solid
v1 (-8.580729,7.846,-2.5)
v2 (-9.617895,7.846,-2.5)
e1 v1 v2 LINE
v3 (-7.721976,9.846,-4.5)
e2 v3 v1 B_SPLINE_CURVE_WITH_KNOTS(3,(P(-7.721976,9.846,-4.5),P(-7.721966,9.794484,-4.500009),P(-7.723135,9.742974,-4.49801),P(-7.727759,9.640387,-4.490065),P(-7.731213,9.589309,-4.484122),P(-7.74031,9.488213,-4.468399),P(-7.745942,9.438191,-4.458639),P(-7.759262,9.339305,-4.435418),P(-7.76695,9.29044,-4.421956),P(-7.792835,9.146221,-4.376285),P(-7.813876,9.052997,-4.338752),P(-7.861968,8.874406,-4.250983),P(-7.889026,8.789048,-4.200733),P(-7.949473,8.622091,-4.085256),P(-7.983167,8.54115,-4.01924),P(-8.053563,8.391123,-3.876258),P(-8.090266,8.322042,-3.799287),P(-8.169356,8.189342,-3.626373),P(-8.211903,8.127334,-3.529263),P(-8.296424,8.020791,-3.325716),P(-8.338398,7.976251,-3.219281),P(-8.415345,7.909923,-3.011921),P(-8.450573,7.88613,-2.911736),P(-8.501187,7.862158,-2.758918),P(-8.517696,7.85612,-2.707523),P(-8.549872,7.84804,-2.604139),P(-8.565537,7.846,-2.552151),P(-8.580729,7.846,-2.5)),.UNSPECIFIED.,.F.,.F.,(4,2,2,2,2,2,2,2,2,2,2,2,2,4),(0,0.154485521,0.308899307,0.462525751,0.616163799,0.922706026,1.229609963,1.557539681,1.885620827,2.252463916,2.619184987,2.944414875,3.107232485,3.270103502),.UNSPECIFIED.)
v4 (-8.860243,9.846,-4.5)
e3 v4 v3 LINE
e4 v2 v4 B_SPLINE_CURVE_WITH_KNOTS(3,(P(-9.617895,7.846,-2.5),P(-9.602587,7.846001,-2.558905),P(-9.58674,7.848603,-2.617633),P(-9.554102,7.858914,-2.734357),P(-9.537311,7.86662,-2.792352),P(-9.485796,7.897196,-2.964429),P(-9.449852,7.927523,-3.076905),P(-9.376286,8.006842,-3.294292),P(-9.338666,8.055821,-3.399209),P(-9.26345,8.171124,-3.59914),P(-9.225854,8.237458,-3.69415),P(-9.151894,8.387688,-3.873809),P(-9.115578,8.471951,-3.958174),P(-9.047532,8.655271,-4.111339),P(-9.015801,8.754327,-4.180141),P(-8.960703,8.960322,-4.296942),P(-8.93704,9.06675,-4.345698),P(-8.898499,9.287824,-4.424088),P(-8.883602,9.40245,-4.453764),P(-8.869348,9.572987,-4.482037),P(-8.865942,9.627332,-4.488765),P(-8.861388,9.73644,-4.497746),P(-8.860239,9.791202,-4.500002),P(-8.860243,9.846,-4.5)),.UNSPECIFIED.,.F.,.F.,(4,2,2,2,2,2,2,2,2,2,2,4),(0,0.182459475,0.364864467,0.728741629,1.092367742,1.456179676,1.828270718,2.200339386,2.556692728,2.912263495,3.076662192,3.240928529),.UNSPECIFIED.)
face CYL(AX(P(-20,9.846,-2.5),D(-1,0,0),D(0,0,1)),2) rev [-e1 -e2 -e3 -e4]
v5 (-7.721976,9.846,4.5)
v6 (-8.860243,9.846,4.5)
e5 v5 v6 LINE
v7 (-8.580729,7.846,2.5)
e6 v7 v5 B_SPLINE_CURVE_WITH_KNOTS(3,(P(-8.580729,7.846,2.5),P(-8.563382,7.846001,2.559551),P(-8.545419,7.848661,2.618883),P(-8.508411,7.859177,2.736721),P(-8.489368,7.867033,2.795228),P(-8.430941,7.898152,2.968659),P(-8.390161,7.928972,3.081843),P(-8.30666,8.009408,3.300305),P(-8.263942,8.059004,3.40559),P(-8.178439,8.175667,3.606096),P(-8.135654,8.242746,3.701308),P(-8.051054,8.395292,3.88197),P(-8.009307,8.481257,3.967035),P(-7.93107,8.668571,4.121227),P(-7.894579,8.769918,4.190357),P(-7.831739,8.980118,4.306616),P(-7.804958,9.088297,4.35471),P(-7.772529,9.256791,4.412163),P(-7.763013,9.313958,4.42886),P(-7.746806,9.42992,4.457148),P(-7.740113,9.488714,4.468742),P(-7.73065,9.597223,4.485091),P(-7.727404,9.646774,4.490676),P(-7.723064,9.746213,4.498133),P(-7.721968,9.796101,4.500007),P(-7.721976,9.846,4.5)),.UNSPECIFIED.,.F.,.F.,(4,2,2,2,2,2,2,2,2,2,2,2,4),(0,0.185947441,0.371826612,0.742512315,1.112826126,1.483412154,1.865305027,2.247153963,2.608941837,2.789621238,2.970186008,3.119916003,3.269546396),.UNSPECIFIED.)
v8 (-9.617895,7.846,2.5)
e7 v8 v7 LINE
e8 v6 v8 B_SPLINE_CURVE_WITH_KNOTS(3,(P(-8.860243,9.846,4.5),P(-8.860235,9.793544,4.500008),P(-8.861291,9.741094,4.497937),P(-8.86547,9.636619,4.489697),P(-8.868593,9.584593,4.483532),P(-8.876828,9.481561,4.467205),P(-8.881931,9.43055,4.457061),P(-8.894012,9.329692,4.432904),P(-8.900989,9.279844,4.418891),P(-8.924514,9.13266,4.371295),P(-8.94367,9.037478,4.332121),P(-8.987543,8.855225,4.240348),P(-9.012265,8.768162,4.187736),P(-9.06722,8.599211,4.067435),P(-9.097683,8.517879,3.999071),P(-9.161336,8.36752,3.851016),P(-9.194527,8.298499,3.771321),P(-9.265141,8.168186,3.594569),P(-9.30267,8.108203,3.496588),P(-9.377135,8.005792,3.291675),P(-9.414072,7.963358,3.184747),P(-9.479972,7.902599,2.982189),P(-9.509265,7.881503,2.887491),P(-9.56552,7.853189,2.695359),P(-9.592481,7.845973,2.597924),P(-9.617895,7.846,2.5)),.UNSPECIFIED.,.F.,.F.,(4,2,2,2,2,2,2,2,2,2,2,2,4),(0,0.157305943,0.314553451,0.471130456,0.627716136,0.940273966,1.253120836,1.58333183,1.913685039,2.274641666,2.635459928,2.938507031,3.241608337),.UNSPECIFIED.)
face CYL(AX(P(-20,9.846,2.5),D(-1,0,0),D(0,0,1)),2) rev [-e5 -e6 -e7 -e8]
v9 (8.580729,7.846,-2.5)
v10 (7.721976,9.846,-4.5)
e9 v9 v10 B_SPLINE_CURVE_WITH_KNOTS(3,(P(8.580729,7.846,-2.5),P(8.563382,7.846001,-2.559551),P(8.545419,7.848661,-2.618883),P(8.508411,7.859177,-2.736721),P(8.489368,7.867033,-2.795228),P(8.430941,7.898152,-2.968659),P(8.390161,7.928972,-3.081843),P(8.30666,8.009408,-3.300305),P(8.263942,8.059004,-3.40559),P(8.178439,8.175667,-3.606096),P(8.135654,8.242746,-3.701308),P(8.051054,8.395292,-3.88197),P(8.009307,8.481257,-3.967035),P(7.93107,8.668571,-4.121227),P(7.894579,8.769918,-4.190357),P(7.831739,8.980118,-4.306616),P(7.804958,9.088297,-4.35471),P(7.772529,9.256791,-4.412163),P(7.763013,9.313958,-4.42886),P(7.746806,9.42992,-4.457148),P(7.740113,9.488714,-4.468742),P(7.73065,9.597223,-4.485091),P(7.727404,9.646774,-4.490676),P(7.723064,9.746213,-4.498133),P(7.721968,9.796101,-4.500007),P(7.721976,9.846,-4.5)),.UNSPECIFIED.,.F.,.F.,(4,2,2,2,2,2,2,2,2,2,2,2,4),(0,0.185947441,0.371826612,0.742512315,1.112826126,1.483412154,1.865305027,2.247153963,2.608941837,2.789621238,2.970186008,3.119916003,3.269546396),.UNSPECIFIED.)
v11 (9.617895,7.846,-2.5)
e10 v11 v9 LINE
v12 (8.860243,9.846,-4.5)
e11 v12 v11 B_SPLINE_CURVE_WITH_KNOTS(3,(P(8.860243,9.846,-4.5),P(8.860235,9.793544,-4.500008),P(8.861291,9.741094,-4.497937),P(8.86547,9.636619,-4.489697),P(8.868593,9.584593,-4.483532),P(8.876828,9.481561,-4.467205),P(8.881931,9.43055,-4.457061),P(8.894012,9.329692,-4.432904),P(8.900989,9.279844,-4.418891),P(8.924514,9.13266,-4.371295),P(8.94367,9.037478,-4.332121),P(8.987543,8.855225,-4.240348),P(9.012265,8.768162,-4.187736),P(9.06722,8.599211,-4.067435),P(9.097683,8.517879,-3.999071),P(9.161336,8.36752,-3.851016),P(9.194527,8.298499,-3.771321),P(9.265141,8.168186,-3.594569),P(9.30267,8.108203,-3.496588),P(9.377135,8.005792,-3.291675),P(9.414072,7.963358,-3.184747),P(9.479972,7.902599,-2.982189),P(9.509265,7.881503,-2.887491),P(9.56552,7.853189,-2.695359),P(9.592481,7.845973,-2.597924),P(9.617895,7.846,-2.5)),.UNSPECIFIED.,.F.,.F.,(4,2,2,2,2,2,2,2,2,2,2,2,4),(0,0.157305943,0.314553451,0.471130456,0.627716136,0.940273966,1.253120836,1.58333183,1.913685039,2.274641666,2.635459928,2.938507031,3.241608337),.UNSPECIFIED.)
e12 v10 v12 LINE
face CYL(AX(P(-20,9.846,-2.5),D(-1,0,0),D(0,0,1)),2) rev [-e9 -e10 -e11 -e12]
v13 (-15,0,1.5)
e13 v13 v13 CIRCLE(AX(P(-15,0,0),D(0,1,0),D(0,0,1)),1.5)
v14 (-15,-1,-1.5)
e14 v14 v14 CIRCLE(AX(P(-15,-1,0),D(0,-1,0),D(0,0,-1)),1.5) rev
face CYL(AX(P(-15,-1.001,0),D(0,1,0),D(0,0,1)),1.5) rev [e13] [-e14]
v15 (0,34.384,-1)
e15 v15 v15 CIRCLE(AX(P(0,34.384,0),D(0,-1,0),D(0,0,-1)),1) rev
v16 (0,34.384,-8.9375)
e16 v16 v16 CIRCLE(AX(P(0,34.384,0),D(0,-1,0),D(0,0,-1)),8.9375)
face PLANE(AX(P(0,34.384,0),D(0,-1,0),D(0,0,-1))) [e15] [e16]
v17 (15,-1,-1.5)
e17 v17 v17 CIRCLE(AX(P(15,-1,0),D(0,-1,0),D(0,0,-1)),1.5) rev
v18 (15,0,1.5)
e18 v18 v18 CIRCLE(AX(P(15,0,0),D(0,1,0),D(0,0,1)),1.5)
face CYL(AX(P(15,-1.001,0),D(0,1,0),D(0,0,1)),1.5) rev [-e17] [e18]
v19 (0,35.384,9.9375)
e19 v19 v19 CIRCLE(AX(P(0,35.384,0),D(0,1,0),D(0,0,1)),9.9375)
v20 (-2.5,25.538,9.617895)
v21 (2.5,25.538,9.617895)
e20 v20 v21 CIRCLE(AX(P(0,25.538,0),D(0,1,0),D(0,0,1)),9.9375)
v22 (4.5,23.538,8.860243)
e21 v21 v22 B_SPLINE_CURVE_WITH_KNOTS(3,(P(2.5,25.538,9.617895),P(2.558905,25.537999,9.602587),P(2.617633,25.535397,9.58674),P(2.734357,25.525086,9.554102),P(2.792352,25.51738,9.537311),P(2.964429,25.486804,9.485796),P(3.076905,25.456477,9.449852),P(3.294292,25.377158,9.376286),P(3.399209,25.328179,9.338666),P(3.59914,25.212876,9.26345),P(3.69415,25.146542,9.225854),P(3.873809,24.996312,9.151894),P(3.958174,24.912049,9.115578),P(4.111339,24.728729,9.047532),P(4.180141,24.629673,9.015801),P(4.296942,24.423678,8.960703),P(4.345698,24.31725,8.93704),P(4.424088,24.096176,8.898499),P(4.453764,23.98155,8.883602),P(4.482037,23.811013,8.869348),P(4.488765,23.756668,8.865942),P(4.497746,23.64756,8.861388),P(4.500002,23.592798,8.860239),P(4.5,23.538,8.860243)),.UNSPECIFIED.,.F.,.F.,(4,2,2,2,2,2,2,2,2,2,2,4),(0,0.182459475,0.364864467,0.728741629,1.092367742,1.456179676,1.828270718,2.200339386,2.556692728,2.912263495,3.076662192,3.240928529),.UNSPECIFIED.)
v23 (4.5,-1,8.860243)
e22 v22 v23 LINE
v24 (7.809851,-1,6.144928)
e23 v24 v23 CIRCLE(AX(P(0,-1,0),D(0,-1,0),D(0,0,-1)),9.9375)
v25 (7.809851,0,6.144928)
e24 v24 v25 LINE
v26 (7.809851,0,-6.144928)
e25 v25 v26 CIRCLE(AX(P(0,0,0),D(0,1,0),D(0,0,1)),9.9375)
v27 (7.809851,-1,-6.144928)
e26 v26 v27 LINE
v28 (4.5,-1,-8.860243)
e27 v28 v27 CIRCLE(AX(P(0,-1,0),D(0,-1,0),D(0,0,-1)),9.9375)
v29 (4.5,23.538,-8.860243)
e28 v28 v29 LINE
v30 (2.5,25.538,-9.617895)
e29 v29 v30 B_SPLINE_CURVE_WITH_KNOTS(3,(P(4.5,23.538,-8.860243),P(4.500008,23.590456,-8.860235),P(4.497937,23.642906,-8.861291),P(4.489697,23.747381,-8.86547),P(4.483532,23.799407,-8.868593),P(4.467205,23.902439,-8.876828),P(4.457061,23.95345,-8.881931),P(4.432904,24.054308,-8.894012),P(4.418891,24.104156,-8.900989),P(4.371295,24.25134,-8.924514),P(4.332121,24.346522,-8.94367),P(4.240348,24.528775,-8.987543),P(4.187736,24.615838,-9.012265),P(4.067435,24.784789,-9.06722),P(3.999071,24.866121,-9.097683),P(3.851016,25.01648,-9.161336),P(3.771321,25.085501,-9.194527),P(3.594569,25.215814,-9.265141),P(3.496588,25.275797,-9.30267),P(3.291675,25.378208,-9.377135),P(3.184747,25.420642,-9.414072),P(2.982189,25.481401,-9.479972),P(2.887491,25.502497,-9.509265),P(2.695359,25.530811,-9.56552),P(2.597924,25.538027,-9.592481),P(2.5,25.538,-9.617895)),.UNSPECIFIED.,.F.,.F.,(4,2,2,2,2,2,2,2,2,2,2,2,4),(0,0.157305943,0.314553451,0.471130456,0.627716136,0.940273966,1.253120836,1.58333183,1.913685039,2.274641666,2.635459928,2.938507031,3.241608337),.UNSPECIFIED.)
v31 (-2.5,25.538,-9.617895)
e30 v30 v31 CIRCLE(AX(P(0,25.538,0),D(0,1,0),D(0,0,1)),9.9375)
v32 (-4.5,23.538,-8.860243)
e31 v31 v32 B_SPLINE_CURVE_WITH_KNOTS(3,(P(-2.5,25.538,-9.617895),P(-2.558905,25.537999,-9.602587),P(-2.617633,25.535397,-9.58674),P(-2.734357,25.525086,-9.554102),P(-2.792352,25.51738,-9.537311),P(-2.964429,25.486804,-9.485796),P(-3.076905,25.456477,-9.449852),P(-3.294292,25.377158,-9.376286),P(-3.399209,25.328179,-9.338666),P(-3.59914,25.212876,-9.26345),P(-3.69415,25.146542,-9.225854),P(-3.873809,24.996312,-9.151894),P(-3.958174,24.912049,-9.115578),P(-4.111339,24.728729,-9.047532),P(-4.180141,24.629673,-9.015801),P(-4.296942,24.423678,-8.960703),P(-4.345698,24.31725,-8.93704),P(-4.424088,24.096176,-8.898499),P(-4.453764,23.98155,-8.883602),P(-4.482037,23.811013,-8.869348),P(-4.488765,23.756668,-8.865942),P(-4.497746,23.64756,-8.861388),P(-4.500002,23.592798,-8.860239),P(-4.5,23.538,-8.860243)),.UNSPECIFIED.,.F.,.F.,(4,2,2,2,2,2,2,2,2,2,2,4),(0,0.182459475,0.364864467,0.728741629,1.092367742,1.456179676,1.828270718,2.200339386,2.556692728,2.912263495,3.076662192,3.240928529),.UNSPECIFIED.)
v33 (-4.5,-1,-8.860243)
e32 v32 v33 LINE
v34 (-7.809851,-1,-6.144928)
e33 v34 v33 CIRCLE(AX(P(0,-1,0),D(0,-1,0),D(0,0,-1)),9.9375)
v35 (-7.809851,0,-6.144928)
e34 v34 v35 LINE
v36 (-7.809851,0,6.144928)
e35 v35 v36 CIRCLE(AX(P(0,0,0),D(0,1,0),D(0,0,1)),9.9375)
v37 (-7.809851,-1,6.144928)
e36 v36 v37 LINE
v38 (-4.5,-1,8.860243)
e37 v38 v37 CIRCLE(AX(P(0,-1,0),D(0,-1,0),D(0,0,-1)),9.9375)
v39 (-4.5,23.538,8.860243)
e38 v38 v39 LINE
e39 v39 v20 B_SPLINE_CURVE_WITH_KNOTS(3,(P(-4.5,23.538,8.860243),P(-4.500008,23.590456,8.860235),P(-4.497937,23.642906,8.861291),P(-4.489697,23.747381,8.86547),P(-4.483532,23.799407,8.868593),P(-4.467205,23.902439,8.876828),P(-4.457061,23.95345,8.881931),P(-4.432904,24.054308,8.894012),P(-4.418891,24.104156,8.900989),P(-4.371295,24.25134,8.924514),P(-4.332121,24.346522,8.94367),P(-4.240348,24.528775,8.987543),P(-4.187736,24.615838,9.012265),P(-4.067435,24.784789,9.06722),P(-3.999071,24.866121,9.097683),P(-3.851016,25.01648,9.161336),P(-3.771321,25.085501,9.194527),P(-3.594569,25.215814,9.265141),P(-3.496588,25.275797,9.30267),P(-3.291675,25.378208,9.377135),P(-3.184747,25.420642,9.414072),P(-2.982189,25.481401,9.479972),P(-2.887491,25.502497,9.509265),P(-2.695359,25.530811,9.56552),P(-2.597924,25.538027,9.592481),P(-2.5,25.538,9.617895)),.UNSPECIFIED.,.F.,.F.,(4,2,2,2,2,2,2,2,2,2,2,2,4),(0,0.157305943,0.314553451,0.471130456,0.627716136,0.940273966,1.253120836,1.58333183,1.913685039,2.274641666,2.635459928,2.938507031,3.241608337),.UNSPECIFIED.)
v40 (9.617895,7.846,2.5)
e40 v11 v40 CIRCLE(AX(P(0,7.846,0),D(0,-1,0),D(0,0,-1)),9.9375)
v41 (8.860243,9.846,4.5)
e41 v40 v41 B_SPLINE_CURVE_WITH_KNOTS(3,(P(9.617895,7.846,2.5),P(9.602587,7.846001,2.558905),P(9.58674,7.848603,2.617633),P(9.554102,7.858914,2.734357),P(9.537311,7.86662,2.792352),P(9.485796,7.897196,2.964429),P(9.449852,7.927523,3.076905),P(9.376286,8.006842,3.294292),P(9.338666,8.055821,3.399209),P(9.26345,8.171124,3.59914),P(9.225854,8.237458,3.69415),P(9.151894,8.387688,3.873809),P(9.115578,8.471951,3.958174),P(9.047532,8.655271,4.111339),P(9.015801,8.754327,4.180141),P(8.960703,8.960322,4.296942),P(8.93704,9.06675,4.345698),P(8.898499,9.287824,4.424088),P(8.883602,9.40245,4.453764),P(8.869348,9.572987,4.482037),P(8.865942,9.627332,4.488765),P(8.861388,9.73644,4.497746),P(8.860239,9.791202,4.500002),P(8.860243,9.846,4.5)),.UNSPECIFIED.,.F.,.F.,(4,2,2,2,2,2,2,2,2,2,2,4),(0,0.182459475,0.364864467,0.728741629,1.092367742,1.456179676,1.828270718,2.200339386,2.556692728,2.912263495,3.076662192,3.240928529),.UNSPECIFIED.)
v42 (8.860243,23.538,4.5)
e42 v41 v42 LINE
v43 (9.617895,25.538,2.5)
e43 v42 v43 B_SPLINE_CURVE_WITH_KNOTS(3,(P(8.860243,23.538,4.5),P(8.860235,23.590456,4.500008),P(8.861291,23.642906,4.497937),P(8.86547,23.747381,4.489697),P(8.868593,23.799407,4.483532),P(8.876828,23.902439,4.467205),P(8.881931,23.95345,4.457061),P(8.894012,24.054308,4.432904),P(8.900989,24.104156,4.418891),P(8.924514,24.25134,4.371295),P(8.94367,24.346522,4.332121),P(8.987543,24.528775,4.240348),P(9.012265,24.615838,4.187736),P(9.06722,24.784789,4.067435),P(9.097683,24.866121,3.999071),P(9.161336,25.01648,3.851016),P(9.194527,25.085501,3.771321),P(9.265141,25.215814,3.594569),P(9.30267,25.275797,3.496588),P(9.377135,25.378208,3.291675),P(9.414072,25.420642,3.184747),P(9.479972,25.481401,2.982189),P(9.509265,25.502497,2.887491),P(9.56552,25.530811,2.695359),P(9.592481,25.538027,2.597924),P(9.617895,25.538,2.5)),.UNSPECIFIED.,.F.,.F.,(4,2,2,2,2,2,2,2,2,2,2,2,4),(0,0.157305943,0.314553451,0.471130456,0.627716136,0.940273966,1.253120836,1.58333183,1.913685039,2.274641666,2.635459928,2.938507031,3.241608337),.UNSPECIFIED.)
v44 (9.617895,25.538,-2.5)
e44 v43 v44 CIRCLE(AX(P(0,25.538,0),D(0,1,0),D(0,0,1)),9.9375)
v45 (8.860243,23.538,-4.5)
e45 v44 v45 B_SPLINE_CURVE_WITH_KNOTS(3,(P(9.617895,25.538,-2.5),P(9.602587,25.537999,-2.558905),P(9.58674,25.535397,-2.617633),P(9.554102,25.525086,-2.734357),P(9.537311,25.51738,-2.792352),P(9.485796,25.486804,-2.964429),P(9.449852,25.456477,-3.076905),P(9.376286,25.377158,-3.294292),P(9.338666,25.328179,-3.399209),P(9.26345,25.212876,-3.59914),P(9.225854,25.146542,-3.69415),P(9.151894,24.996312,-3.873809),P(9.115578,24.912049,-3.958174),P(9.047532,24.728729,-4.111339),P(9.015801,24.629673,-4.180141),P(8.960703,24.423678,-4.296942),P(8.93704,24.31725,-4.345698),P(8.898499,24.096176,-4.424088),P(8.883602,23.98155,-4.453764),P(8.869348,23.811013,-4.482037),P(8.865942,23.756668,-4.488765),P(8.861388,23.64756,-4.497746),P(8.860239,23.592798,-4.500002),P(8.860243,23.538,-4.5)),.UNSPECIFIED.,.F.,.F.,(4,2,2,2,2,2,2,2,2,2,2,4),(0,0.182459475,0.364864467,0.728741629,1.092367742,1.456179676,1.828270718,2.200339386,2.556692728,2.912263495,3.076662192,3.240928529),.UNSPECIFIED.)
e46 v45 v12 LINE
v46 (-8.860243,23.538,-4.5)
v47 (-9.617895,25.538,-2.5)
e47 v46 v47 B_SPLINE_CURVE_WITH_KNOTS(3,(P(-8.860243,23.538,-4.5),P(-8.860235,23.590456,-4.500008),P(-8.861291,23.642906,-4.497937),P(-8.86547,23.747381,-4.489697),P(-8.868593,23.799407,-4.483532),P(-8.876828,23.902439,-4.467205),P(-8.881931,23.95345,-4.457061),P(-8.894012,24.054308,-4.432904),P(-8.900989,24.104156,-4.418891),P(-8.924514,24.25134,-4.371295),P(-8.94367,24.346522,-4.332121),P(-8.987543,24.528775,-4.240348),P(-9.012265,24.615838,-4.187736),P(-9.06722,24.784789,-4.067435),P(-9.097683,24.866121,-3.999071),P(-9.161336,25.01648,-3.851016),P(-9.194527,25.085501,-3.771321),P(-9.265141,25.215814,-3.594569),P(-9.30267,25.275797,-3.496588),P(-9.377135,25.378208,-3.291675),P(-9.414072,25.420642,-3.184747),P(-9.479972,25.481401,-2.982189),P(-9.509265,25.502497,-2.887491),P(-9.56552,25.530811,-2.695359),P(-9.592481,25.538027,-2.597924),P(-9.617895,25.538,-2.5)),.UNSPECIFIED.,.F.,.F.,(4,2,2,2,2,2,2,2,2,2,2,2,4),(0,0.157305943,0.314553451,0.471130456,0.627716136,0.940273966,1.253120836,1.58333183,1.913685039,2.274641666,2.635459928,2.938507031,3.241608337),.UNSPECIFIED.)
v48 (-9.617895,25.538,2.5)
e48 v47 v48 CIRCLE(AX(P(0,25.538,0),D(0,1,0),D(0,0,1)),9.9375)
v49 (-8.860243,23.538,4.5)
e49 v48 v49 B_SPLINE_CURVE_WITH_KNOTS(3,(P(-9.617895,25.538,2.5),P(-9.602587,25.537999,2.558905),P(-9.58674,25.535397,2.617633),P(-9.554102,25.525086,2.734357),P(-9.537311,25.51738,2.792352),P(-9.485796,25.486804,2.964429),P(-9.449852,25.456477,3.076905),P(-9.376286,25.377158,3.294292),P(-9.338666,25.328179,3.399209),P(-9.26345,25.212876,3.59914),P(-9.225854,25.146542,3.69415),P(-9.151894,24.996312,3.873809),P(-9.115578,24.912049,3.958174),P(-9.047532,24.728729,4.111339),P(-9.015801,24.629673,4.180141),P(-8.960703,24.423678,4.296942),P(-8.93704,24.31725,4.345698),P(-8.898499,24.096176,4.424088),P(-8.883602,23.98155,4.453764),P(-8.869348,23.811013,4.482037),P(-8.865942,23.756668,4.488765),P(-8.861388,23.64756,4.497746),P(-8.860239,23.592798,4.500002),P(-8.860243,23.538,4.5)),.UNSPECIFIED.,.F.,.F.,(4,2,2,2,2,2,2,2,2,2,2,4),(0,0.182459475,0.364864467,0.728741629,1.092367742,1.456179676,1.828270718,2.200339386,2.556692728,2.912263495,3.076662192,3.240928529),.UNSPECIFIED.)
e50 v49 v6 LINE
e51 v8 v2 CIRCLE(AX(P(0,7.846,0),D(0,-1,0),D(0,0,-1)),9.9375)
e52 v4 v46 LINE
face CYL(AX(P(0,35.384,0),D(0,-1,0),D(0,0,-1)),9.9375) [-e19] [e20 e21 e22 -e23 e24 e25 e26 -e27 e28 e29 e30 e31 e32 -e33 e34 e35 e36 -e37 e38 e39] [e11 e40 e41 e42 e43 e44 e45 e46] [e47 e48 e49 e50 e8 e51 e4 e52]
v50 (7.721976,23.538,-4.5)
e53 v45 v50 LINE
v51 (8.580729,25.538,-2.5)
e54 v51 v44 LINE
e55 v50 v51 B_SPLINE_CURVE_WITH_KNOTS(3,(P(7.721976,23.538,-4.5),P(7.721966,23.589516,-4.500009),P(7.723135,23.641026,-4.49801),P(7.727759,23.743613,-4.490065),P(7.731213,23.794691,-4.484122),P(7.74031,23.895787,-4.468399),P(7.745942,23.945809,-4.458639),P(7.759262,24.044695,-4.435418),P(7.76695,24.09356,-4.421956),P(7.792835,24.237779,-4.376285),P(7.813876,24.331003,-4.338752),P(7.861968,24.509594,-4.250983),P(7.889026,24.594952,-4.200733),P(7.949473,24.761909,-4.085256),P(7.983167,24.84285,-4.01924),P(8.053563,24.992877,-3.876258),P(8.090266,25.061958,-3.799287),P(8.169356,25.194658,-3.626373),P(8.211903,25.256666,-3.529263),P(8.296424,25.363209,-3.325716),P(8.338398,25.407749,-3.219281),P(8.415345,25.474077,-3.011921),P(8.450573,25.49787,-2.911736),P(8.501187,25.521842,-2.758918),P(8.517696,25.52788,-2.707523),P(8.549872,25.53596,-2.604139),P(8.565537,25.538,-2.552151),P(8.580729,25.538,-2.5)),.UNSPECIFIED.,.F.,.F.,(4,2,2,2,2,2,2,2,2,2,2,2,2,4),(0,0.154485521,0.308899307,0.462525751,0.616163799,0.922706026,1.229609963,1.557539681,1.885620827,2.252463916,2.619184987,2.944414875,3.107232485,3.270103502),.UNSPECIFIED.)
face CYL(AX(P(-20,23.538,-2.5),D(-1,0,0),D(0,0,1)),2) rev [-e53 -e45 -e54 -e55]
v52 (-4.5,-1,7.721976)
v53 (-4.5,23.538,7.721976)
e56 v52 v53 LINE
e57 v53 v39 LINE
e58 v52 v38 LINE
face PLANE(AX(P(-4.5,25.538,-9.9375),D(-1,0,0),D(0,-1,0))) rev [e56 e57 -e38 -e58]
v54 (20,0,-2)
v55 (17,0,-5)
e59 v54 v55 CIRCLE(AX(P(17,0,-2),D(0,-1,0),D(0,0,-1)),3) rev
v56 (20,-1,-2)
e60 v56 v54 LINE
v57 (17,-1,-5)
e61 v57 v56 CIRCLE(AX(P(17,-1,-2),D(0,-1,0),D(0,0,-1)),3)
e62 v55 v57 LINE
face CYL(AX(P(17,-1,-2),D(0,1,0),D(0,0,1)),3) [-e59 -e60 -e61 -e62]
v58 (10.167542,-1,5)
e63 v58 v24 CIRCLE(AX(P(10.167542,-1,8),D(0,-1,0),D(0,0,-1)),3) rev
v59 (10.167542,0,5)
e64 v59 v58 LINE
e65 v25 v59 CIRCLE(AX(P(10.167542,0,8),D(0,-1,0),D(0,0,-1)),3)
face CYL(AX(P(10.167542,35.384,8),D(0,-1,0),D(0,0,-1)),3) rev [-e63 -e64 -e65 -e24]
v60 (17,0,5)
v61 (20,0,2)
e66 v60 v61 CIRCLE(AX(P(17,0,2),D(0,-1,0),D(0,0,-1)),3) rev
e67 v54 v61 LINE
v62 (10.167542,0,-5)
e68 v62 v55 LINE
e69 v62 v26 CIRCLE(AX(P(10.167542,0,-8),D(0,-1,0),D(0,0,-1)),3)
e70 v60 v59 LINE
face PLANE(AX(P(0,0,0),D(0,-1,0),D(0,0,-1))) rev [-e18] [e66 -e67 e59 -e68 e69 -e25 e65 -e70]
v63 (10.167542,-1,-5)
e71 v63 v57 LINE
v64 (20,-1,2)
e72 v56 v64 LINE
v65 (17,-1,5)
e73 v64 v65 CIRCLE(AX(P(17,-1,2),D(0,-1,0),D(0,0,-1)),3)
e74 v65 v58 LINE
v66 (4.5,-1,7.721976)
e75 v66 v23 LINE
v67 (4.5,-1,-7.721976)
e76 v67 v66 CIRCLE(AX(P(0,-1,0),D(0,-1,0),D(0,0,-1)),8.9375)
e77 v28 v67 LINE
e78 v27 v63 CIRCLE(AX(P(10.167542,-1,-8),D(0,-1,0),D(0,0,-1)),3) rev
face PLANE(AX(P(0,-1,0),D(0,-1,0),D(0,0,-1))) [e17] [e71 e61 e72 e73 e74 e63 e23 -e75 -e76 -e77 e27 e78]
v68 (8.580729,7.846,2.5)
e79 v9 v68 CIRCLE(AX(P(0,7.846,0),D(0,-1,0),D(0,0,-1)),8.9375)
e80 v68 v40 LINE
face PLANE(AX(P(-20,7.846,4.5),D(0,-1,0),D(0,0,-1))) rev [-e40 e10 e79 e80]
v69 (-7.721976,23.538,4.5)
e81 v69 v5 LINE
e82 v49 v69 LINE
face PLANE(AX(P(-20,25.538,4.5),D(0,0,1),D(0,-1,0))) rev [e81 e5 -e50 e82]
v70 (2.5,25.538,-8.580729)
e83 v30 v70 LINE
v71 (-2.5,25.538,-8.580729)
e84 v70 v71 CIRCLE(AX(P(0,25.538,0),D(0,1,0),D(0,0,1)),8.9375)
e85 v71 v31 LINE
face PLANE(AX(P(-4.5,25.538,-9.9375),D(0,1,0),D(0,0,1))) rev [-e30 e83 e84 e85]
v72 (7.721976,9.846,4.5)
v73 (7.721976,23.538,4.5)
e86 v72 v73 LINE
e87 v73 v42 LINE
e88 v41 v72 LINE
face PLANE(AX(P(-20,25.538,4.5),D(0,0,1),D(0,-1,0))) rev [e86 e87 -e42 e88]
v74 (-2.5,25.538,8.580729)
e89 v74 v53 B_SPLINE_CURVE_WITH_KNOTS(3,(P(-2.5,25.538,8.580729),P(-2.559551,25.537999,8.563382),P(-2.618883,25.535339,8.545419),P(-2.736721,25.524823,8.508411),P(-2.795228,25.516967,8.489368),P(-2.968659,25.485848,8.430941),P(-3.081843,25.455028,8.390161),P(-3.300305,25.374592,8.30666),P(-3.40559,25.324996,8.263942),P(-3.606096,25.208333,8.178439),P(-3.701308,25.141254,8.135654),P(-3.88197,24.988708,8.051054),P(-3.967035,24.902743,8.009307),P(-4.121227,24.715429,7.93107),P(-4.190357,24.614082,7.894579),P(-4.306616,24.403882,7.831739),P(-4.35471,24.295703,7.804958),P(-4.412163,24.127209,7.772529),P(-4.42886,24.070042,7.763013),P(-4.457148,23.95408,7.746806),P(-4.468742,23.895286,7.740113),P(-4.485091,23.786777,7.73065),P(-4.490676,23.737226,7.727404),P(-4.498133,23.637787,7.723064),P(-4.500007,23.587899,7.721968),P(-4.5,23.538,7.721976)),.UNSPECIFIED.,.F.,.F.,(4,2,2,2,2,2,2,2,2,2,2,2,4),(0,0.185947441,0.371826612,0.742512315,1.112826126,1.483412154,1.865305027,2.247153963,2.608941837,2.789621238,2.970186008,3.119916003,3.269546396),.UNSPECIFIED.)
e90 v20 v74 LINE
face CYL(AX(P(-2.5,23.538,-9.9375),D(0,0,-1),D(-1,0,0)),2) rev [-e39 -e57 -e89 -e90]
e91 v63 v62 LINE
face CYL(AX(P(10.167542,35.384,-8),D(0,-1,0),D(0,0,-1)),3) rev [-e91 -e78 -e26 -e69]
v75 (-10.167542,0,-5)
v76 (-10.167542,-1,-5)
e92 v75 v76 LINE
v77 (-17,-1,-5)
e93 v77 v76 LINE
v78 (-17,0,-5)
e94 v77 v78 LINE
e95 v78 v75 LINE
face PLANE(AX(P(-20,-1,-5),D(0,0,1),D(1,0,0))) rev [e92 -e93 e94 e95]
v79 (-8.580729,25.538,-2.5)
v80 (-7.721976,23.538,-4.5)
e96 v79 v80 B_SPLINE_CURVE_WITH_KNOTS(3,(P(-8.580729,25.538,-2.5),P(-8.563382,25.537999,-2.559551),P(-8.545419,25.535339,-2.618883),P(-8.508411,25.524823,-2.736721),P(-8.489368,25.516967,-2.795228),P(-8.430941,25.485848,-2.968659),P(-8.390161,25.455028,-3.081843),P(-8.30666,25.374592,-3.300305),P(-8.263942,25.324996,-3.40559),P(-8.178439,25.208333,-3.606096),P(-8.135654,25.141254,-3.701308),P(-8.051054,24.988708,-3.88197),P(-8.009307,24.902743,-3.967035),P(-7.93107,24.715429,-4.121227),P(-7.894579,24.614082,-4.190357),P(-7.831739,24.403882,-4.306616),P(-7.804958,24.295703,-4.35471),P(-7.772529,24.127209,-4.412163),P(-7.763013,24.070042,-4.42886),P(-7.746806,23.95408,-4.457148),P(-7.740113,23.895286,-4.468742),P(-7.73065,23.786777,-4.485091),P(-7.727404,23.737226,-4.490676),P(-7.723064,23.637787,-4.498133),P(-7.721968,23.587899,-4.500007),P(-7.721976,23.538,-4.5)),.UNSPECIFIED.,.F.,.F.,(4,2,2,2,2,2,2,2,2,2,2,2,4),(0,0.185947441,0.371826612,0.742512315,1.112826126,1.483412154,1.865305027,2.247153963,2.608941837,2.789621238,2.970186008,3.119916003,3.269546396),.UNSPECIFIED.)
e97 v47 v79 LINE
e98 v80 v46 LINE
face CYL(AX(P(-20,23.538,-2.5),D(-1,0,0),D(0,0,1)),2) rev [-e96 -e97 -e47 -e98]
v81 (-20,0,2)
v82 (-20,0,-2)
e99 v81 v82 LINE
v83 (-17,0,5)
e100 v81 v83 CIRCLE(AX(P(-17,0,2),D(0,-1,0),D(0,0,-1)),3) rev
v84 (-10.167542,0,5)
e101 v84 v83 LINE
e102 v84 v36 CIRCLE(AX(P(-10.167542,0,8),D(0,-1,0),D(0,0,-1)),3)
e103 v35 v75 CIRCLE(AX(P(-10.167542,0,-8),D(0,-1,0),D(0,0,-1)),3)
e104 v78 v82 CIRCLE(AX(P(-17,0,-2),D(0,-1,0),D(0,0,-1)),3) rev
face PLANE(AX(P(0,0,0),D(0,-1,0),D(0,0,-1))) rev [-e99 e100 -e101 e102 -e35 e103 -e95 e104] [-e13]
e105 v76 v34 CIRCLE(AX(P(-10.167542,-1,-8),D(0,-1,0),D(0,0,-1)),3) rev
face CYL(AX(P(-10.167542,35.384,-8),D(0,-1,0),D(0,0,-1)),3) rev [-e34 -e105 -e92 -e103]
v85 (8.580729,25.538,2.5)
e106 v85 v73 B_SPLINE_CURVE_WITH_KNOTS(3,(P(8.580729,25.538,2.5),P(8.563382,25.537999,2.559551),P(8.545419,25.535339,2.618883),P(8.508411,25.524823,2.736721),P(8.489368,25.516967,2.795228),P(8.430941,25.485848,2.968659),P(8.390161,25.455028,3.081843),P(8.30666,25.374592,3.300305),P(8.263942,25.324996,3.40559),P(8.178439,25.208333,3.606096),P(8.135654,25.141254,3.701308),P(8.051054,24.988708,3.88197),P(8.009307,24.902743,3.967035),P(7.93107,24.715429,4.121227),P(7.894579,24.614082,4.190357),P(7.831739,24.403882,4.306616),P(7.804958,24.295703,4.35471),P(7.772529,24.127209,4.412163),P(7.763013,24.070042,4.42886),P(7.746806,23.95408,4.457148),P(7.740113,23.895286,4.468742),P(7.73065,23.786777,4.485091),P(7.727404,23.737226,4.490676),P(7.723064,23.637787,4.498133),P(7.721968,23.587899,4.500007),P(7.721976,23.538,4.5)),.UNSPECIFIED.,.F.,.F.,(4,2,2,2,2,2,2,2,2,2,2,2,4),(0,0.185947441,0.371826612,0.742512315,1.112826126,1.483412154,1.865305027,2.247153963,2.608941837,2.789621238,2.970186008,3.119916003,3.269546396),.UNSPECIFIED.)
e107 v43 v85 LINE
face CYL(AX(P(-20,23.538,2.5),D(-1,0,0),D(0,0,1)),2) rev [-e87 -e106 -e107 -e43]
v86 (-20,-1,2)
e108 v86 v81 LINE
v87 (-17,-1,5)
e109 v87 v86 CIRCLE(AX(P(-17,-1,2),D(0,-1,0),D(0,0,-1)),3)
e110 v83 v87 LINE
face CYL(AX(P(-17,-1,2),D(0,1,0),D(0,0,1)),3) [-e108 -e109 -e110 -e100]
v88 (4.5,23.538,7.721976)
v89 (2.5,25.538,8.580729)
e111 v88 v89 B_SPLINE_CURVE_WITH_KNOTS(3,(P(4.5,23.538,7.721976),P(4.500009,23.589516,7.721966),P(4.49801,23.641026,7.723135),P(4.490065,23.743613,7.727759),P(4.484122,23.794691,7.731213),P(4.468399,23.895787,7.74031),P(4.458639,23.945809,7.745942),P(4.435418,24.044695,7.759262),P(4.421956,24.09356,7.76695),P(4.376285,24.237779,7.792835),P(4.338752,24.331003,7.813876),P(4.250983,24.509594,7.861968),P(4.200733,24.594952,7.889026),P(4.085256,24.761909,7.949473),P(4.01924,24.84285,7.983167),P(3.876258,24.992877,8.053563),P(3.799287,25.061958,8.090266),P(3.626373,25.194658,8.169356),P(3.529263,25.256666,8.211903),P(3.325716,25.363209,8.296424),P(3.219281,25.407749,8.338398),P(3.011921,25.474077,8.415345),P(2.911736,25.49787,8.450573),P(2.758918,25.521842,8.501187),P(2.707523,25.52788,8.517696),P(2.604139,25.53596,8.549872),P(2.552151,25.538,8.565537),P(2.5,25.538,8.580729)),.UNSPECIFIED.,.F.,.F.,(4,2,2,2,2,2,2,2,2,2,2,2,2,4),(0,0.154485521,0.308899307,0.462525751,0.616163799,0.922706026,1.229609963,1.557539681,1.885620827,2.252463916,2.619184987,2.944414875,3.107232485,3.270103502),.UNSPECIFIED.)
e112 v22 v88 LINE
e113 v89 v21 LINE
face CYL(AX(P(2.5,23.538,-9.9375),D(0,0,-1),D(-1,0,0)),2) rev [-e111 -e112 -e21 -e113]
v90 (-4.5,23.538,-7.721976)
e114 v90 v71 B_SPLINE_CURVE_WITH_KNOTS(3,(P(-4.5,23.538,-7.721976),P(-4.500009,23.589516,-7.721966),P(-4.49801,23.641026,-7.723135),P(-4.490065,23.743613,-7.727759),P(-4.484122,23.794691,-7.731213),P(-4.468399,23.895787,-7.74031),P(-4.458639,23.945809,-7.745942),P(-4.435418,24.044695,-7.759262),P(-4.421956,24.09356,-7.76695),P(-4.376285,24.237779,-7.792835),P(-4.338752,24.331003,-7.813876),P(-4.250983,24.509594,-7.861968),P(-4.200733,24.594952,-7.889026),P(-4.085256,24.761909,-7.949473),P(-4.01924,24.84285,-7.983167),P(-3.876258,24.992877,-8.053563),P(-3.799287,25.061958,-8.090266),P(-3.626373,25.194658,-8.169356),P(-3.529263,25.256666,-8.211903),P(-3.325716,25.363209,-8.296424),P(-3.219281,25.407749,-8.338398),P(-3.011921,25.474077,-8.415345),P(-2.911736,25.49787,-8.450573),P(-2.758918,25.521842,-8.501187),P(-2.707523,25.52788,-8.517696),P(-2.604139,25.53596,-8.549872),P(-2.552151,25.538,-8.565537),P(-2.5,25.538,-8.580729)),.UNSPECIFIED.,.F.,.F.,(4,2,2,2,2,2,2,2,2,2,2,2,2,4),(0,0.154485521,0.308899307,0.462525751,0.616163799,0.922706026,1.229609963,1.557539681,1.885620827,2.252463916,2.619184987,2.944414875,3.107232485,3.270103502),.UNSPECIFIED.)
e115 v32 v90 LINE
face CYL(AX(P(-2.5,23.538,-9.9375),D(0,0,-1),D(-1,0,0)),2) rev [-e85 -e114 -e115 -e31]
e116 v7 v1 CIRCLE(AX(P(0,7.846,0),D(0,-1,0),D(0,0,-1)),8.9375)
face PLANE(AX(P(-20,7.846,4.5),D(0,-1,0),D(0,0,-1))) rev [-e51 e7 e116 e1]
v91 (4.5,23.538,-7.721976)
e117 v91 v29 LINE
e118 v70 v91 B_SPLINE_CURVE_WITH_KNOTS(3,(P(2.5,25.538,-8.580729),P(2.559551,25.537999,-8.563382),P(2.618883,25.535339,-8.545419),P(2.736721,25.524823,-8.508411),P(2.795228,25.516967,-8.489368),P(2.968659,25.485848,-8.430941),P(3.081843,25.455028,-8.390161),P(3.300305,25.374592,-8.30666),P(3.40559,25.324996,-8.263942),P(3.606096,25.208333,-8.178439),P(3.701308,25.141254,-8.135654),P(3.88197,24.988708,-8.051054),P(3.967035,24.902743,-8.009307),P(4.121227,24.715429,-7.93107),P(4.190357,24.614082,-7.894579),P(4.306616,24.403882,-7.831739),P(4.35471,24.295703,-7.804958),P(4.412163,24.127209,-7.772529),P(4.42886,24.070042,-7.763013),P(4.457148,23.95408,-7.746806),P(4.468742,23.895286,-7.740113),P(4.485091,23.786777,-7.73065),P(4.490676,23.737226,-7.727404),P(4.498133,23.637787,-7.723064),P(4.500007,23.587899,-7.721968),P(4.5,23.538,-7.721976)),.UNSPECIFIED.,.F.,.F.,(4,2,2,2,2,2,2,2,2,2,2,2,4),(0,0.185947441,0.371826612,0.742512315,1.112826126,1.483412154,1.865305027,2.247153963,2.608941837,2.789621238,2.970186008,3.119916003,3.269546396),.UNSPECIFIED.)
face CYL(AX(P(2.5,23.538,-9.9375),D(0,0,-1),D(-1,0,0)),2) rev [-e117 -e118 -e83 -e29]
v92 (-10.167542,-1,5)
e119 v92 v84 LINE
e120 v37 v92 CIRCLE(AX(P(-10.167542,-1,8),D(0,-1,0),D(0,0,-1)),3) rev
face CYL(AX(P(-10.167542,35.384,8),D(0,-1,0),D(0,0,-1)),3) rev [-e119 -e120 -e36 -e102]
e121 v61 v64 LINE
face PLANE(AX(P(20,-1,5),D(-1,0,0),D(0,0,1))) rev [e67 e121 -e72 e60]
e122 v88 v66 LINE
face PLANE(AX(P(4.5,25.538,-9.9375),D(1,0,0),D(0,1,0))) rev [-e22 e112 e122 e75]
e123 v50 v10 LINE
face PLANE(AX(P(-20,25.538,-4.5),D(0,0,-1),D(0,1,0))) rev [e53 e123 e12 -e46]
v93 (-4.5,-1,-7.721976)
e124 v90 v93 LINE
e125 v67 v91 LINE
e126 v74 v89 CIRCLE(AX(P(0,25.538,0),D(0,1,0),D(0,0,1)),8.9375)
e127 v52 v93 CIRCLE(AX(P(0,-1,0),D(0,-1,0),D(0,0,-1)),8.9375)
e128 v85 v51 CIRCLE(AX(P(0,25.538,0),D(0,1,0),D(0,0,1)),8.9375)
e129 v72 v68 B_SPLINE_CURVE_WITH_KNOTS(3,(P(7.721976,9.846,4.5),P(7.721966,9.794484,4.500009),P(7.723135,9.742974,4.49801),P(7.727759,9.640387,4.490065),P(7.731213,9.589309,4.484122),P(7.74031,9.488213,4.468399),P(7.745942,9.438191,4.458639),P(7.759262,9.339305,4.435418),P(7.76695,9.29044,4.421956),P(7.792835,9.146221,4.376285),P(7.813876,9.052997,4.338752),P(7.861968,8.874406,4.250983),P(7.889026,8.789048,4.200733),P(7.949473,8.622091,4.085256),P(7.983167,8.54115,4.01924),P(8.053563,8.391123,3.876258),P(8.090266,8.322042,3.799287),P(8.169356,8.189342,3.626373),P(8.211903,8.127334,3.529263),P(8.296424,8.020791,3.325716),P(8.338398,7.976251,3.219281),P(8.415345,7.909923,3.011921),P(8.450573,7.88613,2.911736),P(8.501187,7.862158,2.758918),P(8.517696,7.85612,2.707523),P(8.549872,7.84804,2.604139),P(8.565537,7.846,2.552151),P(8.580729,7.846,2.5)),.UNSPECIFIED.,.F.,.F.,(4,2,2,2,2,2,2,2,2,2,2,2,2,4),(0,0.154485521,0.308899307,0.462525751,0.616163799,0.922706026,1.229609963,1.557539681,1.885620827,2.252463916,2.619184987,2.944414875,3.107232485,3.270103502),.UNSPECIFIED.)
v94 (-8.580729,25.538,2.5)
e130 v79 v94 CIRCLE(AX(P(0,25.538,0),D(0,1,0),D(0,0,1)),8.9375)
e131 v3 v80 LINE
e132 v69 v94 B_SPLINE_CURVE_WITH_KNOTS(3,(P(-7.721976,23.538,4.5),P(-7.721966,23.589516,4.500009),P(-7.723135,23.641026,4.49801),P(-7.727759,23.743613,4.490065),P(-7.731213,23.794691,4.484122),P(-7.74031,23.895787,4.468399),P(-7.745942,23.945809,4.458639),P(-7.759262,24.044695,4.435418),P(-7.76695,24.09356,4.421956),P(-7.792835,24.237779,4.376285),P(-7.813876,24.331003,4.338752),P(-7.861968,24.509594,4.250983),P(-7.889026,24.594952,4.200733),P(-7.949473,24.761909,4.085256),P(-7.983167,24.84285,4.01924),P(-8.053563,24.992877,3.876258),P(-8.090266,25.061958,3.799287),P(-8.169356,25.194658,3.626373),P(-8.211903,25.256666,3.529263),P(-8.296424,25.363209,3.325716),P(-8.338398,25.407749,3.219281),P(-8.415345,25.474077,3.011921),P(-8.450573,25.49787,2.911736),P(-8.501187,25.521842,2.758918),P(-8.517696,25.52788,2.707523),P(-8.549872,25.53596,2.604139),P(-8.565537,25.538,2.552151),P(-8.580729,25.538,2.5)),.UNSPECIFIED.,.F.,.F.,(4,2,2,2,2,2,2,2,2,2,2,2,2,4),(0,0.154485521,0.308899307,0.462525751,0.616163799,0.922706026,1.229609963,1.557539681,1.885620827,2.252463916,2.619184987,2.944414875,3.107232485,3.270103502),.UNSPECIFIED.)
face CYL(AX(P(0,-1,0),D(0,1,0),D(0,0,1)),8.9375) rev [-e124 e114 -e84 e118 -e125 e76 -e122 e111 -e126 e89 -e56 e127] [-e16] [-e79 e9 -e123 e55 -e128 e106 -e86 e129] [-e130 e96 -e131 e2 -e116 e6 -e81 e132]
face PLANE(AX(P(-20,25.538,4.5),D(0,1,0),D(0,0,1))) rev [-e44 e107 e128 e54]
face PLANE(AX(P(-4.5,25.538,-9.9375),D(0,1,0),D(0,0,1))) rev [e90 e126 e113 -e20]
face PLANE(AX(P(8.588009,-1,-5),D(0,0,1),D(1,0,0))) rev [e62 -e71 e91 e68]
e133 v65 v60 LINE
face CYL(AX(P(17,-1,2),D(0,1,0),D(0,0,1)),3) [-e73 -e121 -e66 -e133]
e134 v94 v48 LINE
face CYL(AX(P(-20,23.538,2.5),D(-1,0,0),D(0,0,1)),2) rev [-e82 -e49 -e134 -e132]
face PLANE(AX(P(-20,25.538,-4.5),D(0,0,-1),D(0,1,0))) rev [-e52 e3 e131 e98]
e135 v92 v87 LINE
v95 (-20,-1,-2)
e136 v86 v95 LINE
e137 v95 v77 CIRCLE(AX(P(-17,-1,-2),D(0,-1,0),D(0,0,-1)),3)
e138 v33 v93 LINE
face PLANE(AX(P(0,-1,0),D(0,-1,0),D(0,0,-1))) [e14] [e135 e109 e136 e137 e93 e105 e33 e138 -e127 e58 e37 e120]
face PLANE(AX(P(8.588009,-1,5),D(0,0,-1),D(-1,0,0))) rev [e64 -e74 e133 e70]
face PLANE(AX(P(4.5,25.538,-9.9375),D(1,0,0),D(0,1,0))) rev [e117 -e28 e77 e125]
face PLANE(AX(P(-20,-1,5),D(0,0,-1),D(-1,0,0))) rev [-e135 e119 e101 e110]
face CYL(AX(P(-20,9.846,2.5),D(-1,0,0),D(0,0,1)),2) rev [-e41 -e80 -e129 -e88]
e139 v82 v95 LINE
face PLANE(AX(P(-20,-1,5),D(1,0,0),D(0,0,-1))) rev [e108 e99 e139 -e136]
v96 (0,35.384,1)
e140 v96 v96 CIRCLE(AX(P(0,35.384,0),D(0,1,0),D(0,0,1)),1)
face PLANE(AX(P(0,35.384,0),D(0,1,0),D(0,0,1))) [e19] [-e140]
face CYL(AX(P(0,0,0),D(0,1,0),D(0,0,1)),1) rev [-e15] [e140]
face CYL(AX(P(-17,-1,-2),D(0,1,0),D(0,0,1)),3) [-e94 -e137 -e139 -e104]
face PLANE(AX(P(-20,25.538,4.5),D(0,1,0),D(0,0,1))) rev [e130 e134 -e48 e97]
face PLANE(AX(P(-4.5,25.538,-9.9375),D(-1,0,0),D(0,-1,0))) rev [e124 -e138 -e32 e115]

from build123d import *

# Parameters (mm, degrees)
SKETCH2_R           = 9.9375
BOSS_EXTRUDE1_DEPTH = 35.384
SKETCH4_R           = 1
CUT_EXTRUDE2_DEPTH  = 39.072762817
BOSS_EXTRUDE2_START = 1
SKETCH11_R          = 8.9375
BOSS_EXTRUDE2_DEPTH = 1
SKETCH12_R          = 8.9375
CUT_EXTRUDE7_DEPTH  = 34.384
CUT_EXTRUDE8_START  = -1
CUT_EXTRUDE8_DEPTH  = 26.538
SKETCH14_W          = 9
SKETCH14_H          = 17.692
CUT_EXTRUDE9_DEPTH  = 63.054664307
FILLET3_R           = 2
FILLET4_R           = 3
CUT_EXTRUDE10_REACH = 43.842
SKETCH15_R          = 1.5


# Read off the part's stored shape, not the designer's step: Cut-Extrude8
with BuildPart() as part:
    # Sketch2 → Boss-Extrude1 (new body)
    with BuildSketch(Plane(origin=(0, 0, 0), x_dir=(1, 0, 0), z_dir=(0, 1, 0))):
        with Locations(Location((0, 0, 0), (0, 0, 270))):
            Circle(SKETCH2_R)
    extrude(amount=BOSS_EXTRUDE1_DEPTH)

    # Sketch4 → Cut-Extrude2 (cut, through all)
    with BuildSketch(Plane(origin=(0, 35.384, 0), x_dir=(1, 0, 0), z_dir=(0, 1, 0))):
        with Locations(Location((0, 0, 0), (0, 0, 270))):
            Circle(SKETCH4_R)
    extrude(amount=-CUT_EXTRUDE2_DEPTH, mode=Mode.SUBTRACT)

    # Sketch11 → Boss-Extrude2 (add)
    with BuildSketch(Plane.XZ.offset(BOSS_EXTRUDE2_START)):
        with BuildLine():
            Line((8.588009446, 5), (20, 5))
            Line((20, 5), (20, -5))
            Line((20, -5), (8.588009446, -5))
            ThreePointArc((8.588009446, -5), (0, -9.9375), (-8.588009446, -5))
            Line((-8.588009446, -5), (-20, -5))
            Line((-20, -5), (-20, 5))
            Line((-20, 5), (-8.588009446, 5))
            ThreePointArc((-8.588009446, 5), (0, 9.9375), (8.588009446, 5))
        make_face()
        with Locations(Location((0, 0, 0), (0, 0, 270))):
            Circle(SKETCH11_R, mode=Mode.SUBTRACT)
    extrude(amount=-BOSS_EXTRUDE2_DEPTH)

    # Sketch12 → Cut-Extrude7 (cut)
    with BuildSketch(Plane.XZ):
        with Locations(Location((0, 0, 0), (0, 0, 270))):
            Circle(SKETCH12_R)
    extrude(amount=-CUT_EXTRUDE7_DEPTH, mode=Mode.SUBTRACT)

    # Cut-Extrude8 outline → Cut-Extrude8 (cut)
    with BuildSketch(Plane(origin=(0, 0, 0), x_dir=(1, 0, 0), z_dir=(0, 1, 0)).offset(CUT_EXTRUDE8_START)):
        with BuildLine():
            ThreePointArc((4.5, -7.721975541), (0, -8.9375), (-4.5, -7.721975541))
            Line((-4.5, -7.721975541), (-4.5, -8.860243013))
            ThreePointArc((-4.5, -8.860243013), (0, -9.9375), (4.5, -8.860243013))
            Line((4.5, -8.860243013), (4.5, -7.721975541))
        make_face()
        with BuildLine():
            Line((-4.5, 8.860243013), (-4.5, 7.721975541))
            ThreePointArc((-4.5, 7.721975541), (0, 8.9375), (4.5, 7.721975541))
            Line((4.5, 7.721975541), (4.5, 8.860243013))
            ThreePointArc((4.5, 8.860243013), (0, 9.9375), (-4.5, 8.860243013))
        make_face()
    extrude(amount=CUT_EXTRUDE8_DEPTH, mode=Mode.SUBTRACT)

    # Sketch14 → Cut-Extrude9 (cut, through all)
    with BuildSketch(Plane(origin=(30, 0, 0), x_dir=(0, 0, -1), z_dir=(1, 0, 0))):
        with Locations((0, 16.692)):
            Rectangle(SKETCH14_W, SKETCH14_H)
    extrude(amount=-CUT_EXTRUDE9_DEPTH, mode=Mode.SUBTRACT)

    # Fillet3
    fillet3_edges = [part.edges().sort_by_distance(p)[0] for p in [
        (4.5, 25.538, 8.291109277),
        (4.5, 25.538, -8.291109277),
        (-4.5, 25.538, -8.291109277),
        (-4.5, 25.538, 8.291109277),
        (8.291109277, 25.538, -4.5),
        (-8.291109277, 25.538, -4.5),
        (8.291109277, 7.846, -4.5),
        (-8.291109277, 7.846, -4.5),
        (-8.291109277, 7.846, 4.5),
        (8.291109277, 7.846, 4.5),
        (8.291109277, 25.538, 4.5),
        (-8.291109277, 25.538, 4.5),
    ]]
    fillet(fillet3_edges, radius=FILLET3_R)

    # Fillet4
    # the kernel refuses this fillet: 3 mm, written as the material it adds along each edge
    with BuildSketch(Plane(origin=(8.588009446, -1, -5), x_dir=(-0.562116261978449, 0, -0.8270582252897166), z_dir=(0, 1, 0)), Plane(origin=(-8.588009446, -1, 5), x_dir=(0.5621162619784511, 0, 0.8270582252897152), z_dir=(0, 1, 0))) as fillet4_piece_1:
        with BuildLine():
            CenterArc((1.593293854, -2.992714011), FILLET4_R, 93.994010432, 51.803711499)
            Line((-0.887880822, -1.306365225), (0, 0))
            ThreePointArc((0, 0), (0.692168641, -0.024134839), (1.384337283, 0))
        make_face()
    extrude(amount=1)
    with BuildSketch(Plane(origin=(8.588009446, -1, 5), x_dir=(-0.5621162619784463, 0, 0.8270582252897184), z_dir=(0, 1, 0)), Plane(origin=(-8.588009446, -1, -5), x_dir=(0.5621162619784531, 0, -0.8270582252897138), z_dir=(0, 1, 0))) as fillet4_piece_2:
        with BuildLine():
            CenterArc((1.593293854, 2.992714011), FILLET4_R, 214.20227807, 51.803711499)
            Line((-0.887880822, 1.306365225), (0, 0))
            ThreePointArc((0, 0), (0.692168641, 0.024134839), (1.384337283, 0))
        make_face()
    extrude(amount=1)
    # the kernel refuses this fillet: 3 mm, written as the material it takes off along each edge
    with BuildSketch(Plane(origin=(20, -8.5, -5), x_dir=(0, 0, 1), z_dir=(0, 1, 0)), Plane(origin=(20, -8.5, 5), x_dir=(-1, 0, 0), z_dir=(0, 1, 0))) as fillet4_2_piece_1:
        with BuildLine():
            CenterArc((FILLET4_R, -FILLET4_R), FILLET4_R, 90, 90)
            Line((0, -FILLET4_R), (0, 0))
            Line((0, 0), (FILLET4_R, 0))
        make_face()
    extrude(amount=16, mode=Mode.SUBTRACT)
    with BuildSketch(Plane(origin=(-20, -8.5, 5), x_dir=(1, 0, 0), z_dir=(0, 1, 0)), Plane(origin=(-20, -8.5, -5), x_dir=(0, 0, 1), z_dir=(0, 1, 0))) as fillet4_2_piece_2:
        with BuildLine():
            CenterArc((FILLET4_R, FILLET4_R), FILLET4_R, 180, 90)
            Line((0, FILLET4_R), (0, 0))
            Line((0, 0), (FILLET4_R, 0))
        make_face()
    extrude(amount=16, mode=Mode.SUBTRACT)

    # Sketch15 → Cut-Extrude10 (cut, up to next)
    with BuildSketch(Plane(origin=(0, 0, 0), x_dir=(1, 0, 0), z_dir=(0, 1, 0)), mode=Mode.PRIVATE) as cut_extrude10_sk1:
        with Locations(Location((-15, 0, 0), (0, 0, 270))):
            Circle(SKETCH15_R)
    cut_extrude10_tool1 = extrude(cut_extrude10_sk1.sketch, amount=-CUT_EXTRUDE10_REACH, mode=Mode.PRIVATE) & part.part
    # Sketch15 → Cut-Extrude10 (cut, up to next)
    with BuildSketch(Plane(origin=(0, 0, 0), x_dir=(1, 0, 0), z_dir=(0, 1, 0)), mode=Mode.PRIVATE) as cut_extrude10_sk2:
        with Locations(Location((15, 0, 0), (0, 0, 270))):
            Circle(SKETCH15_R)
    cut_extrude10_tool2 = extrude(cut_extrude10_sk2.sketch, amount=-CUT_EXTRUDE10_REACH, mode=Mode.PRIVATE) & part.part
    add(cut_extrude10_tool1.solids().sort_by_distance((-15, 0, 0))[0], mode=Mode.SUBTRACT)
    add(cut_extrude10_tool2.solids().sort_by_distance((15, 0, 0))[0], mode=Mode.SUBTRACT)


solid = part.part
